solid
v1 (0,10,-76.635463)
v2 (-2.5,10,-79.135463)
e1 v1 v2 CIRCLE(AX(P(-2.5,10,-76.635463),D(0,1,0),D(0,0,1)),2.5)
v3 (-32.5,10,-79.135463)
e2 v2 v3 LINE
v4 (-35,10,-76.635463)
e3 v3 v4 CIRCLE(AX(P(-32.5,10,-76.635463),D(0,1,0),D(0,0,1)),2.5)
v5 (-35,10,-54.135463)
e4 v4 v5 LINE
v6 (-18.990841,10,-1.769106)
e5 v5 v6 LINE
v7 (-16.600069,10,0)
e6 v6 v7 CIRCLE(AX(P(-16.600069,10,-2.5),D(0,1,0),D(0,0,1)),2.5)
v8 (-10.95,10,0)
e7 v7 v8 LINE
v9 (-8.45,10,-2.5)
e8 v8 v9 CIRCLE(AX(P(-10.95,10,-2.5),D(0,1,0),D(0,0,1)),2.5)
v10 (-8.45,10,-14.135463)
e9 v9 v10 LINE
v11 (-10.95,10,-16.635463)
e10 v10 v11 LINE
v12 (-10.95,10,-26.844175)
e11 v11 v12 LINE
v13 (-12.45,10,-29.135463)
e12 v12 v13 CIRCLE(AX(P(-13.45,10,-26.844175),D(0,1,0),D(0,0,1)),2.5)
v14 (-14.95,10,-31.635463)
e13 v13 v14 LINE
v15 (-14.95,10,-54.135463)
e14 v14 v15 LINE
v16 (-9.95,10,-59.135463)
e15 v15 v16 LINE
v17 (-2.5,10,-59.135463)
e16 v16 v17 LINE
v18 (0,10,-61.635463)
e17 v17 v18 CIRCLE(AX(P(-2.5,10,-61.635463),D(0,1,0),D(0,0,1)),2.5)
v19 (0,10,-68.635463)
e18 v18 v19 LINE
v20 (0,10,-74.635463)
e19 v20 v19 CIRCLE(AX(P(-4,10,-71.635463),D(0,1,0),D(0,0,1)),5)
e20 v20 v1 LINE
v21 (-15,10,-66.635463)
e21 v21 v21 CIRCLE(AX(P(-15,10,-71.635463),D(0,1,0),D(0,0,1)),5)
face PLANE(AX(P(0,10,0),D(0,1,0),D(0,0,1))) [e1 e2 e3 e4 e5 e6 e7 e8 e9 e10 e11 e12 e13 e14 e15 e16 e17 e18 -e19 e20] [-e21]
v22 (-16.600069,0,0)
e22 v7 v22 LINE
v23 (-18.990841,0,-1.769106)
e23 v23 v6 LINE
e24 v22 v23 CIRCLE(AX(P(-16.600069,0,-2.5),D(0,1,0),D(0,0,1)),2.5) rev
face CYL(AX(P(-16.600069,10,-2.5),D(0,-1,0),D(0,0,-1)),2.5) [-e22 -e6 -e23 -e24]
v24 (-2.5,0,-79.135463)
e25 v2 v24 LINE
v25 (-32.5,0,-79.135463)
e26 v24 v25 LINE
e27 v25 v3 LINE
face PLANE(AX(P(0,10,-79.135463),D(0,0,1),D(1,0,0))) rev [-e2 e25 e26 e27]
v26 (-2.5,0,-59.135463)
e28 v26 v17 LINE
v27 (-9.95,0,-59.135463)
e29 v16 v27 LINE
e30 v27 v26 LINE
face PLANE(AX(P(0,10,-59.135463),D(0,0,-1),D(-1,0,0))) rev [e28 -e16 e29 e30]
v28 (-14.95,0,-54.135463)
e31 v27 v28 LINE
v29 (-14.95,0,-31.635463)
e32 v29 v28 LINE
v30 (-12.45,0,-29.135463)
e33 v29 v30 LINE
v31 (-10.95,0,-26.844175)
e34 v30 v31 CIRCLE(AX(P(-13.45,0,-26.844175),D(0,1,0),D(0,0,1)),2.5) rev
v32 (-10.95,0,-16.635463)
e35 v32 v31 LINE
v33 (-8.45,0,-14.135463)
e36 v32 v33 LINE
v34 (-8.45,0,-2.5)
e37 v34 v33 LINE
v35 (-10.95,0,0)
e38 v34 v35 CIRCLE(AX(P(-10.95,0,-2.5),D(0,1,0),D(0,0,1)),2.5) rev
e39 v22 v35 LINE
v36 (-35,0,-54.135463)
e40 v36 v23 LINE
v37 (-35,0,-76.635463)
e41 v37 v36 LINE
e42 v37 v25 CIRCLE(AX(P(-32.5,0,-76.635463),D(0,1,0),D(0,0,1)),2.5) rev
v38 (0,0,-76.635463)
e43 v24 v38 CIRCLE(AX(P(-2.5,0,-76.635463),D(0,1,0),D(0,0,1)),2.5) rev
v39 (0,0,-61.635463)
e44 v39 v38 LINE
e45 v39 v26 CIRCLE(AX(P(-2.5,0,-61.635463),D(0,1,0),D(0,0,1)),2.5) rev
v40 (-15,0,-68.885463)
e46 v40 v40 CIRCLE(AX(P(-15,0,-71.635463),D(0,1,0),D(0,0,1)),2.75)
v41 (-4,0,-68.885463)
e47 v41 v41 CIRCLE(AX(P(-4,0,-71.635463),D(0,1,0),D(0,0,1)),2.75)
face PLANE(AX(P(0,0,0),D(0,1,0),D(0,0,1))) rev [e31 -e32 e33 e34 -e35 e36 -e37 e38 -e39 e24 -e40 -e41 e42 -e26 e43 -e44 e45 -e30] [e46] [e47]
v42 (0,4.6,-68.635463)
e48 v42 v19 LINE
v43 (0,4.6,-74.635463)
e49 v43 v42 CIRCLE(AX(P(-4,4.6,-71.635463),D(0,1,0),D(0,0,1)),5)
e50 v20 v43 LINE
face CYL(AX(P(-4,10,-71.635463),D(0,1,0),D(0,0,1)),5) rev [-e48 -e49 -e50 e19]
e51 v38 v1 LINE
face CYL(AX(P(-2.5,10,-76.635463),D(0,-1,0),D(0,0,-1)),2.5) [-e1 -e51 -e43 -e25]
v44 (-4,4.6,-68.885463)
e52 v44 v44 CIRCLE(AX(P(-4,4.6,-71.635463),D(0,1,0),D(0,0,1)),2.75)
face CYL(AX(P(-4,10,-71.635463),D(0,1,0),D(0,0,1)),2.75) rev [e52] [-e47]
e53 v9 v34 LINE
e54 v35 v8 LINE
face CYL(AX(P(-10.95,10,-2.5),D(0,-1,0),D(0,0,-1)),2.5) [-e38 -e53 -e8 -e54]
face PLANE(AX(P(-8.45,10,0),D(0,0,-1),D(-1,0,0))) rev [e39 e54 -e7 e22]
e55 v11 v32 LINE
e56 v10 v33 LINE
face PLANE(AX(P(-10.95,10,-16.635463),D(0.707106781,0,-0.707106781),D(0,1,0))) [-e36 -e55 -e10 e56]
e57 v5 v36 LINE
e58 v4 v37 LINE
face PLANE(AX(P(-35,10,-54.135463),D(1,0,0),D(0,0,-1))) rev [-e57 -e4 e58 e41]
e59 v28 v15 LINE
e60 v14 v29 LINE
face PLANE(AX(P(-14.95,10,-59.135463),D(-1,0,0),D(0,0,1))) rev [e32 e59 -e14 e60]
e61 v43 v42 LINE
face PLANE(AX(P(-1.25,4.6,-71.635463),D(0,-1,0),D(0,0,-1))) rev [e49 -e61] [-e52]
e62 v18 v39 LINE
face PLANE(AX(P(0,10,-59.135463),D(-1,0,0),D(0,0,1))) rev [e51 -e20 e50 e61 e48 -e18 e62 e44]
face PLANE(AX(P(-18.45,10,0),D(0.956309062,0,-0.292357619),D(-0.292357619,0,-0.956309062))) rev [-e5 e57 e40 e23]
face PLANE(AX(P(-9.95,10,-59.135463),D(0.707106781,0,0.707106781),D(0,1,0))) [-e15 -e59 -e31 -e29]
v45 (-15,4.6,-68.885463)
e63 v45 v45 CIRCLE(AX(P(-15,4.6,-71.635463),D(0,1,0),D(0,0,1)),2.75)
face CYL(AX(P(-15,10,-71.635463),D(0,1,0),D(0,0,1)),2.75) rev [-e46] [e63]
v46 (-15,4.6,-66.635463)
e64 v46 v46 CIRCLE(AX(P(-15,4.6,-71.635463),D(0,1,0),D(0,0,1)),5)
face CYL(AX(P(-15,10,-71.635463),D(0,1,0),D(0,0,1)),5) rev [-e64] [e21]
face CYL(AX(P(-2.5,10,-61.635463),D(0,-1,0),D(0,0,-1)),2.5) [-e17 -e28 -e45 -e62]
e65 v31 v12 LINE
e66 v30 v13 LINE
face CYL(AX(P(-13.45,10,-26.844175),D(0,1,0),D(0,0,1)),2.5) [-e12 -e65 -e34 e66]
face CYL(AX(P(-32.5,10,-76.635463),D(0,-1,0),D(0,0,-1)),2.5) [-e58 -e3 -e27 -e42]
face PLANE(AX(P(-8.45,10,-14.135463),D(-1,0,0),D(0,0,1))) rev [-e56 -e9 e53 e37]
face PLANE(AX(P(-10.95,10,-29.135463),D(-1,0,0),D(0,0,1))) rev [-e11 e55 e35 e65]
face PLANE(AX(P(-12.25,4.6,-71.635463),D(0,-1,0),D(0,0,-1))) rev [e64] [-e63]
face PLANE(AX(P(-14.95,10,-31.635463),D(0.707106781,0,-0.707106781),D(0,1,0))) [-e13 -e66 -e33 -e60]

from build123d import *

# Parameters (mm, degrees)
BOSS_EXTRUDE1_DEPTH                                 = 10
CHAMFER1_SIZE                                       = 5
CHAMFER2_SIZE                                       = 2.5
FILLET1_R                                           = 2.5
CBORE_FOR_M5_HEX_SOCKET_HEAD_CAP_SCREW2_D           = 5.5
CBORE_FOR_M5_HEX_SOCKET_HEAD_CAP_SCREW2_DEPTH       = 10
CBORE_FOR_M5_HEX_SOCKET_HEAD_CAP_SCREW2_CBORE_D     = 10
CBORE_FOR_M5_HEX_SOCKET_HEAD_CAP_SCREW2_CBORE_DEPTH = 5.4
CBORE_FOR_M5_HEX_SOCKET_HEAD_CAP_SCREW2_TIP         = 1.652366702


# Some blends are built 0.0001 mm under size
with BuildPart() as part:
    # Sketch2 → Boss-Extrude1 (new body)
    with BuildSketch(Plane(origin=(0, 0, 0), x_dir=(1, 0, 0), z_dir=(0, 1, 0))):
        Polygon((0, 59.135462652), (-14.95, 59.135462652), (-14.95, 29.135462652), (-10.95, 29.135462652), (-10.95, 14.135462652), (-8.45, 14.135462652), (-8.45, 0), (-18.45, 0), (-35, 54.135462652), (-35, 79.135462652), (0, 79.135462652), align=None)
    extrude(amount=BOSS_EXTRUDE1_DEPTH)

    # Chamfer1
    chamfer1_edges = [part.edges().sort_by_distance(p)[0] for p in [
        (-14.95, 5, -59.135462652),
    ]]
    chamfer(chamfer1_edges, length=CHAMFER1_SIZE)

    # Chamfer2
    chamfer2_edges = [part.edges().sort_by_distance(p)[0] for p in [
        (-10.95, 5, -14.135462652),
        (-14.95, 5, -29.135462652),
    ]]
    chamfer(chamfer2_edges, length=CHAMFER2_SIZE - 0.0001)  # a hair under: the kernel refuses the full size

    # Fillet1
    # the kernel refuses this fillet: 2.5 mm, written as the material it takes off along each edge
    with BuildSketch(Plane(origin=(0, -6.25, -79.135462652), x_dir=(0, 0, 1), z_dir=(0, 1, 0)), Plane(origin=(-35, -6.25, -79.135462652), x_dir=(1, 0, 0), z_dir=(0, 1, 0)), Plane(origin=(0, -6.25, -59.135462652), x_dir=(-1, 0, 0), z_dir=(0, 1, 0))) as fillet1_piece_1:
        with BuildLine():
            CenterArc((FILLET1_R, -FILLET1_R), FILLET1_R, 90, 90)
            Line((0, -FILLET1_R), (-FILLET1_R * 0.02, -FILLET1_R))
            Line((-FILLET1_R * 0.02, -FILLET1_R), (-FILLET1_R * 0.02, FILLET1_R * 0.02))
            Line((-FILLET1_R * 0.02, FILLET1_R * 0.02), (FILLET1_R, FILLET1_R * 0.02))
            Line((FILLET1_R, FILLET1_R * 0.02), (FILLET1_R, 0))
        make_face()
    extrude(amount=22.5, mode=Mode.SUBTRACT)
    with BuildSketch(Plane(origin=(-8.45, -6.25, 0), x_dir=(0, 0, -1), z_dir=(0, 1, 0))) as fillet1_piece_2:
        with BuildLine():
            CenterArc((FILLET1_R, FILLET1_R), FILLET1_R, 180, 90)
            Line((0, FILLET1_R), (-FILLET1_R * 0.02, FILLET1_R))
            Line((-FILLET1_R * 0.02, FILLET1_R), (-FILLET1_R * 0.02, -FILLET1_R * 0.02))
            Line((-FILLET1_R * 0.02, -FILLET1_R * 0.02), (FILLET1_R, -FILLET1_R * 0.02))
            Line((FILLET1_R, -FILLET1_R * 0.02), (FILLET1_R, 0))
        make_face()
    extrude(amount=22.5, mode=Mode.SUBTRACT)
    with BuildSketch(Plane(origin=(-18.45, -4.62482795, 0), x_dir=(-0.29235761927834925, 0, -0.9563090622021188), z_dir=(0, 1, 0))) as fillet1_piece_3:
        with BuildLine():
            CenterArc((FILLET1_R * 0.739972471966, -FILLET1_R), FILLET1_R, 90, 73.00084391)
            Line((-FILLET1_R * 0.216336590236, -FILLET1_R * 0.707642380722), (-FILLET1_R * 0.23546277148, -FILLET1_R * 0.701795228336))
            Line((-FILLET1_R * 0.23546277148, -FILLET1_R * 0.701795228336), (-FILLET1_R * 0.0147994494393, FILLET1_R * 0.02))
            Line((-FILLET1_R * 0.0147994494393, FILLET1_R * 0.02), (FILLET1_R * 0.739972471966, FILLET1_R * 0.02))
            Line((FILLET1_R * 0.739972471966, FILLET1_R * 0.02), (FILLET1_R * 0.739972471966, 0))
        make_face()
    extrude(amount=19.2496559, mode=Mode.SUBTRACT)
    with BuildSketch(Plane(origin=(-10.95, -5.728328721, -29.135462652), x_dir=(-1, 0, 0), z_dir=(0, 1, 0))) as fillet1_piece_4:
        with BuildLine():
            CenterArc((2.5, 2.291331488), FILLET1_R, 180, 66.424322091)
            Line((0, 2.291331488), (-0.05, 2.291331488))
            Line((-0.05, 2.291331488), (-0.05, 0))
            Line((-0.05, 0), (0, -0.05))
            ThreePointArc((0, -0.05), (0.75005, -0.05), (1.480102, -0.04582663))
            Line((1.480102, -0.04582663), (1.5001, 0))
        make_face()
    extrude(amount=21.456657442, mode=Mode.SUBTRACT)

    # CBORE for M5 Hex Socket Head Cap Screw2
    with Locations(Plane(origin=(0, 10, 0), x_dir=(1, 0, 0), z_dir=(0, 1, 0))):
        with Locations((-15, 71.635462652), (-4, 71.635462652)):
            CounterBoreHole(CBORE_FOR_M5_HEX_SOCKET_HEAD_CAP_SCREW2_D / 2, CBORE_FOR_M5_HEX_SOCKET_HEAD_CAP_SCREW2_CBORE_D / 2, CBORE_FOR_M5_HEX_SOCKET_HEAD_CAP_SCREW2_CBORE_DEPTH, depth=CBORE_FOR_M5_HEX_SOCKET_HEAD_CAP_SCREW2_DEPTH)
            with Locations((0, 0, -(CBORE_FOR_M5_HEX_SOCKET_HEAD_CAP_SCREW2_DEPTH + CBORE_FOR_M5_HEX_SOCKET_HEAD_CAP_SCREW2_TIP / 2))):  # 118° drill point
                Cone(0, CBORE_FOR_M5_HEX_SOCKET_HEAD_CAP_SCREW2_D / 2, CBORE_FOR_M5_HEX_SOCKET_HEAD_CAP_SCREW2_TIP, mode=Mode.SUBTRACT)


solid = part.part
